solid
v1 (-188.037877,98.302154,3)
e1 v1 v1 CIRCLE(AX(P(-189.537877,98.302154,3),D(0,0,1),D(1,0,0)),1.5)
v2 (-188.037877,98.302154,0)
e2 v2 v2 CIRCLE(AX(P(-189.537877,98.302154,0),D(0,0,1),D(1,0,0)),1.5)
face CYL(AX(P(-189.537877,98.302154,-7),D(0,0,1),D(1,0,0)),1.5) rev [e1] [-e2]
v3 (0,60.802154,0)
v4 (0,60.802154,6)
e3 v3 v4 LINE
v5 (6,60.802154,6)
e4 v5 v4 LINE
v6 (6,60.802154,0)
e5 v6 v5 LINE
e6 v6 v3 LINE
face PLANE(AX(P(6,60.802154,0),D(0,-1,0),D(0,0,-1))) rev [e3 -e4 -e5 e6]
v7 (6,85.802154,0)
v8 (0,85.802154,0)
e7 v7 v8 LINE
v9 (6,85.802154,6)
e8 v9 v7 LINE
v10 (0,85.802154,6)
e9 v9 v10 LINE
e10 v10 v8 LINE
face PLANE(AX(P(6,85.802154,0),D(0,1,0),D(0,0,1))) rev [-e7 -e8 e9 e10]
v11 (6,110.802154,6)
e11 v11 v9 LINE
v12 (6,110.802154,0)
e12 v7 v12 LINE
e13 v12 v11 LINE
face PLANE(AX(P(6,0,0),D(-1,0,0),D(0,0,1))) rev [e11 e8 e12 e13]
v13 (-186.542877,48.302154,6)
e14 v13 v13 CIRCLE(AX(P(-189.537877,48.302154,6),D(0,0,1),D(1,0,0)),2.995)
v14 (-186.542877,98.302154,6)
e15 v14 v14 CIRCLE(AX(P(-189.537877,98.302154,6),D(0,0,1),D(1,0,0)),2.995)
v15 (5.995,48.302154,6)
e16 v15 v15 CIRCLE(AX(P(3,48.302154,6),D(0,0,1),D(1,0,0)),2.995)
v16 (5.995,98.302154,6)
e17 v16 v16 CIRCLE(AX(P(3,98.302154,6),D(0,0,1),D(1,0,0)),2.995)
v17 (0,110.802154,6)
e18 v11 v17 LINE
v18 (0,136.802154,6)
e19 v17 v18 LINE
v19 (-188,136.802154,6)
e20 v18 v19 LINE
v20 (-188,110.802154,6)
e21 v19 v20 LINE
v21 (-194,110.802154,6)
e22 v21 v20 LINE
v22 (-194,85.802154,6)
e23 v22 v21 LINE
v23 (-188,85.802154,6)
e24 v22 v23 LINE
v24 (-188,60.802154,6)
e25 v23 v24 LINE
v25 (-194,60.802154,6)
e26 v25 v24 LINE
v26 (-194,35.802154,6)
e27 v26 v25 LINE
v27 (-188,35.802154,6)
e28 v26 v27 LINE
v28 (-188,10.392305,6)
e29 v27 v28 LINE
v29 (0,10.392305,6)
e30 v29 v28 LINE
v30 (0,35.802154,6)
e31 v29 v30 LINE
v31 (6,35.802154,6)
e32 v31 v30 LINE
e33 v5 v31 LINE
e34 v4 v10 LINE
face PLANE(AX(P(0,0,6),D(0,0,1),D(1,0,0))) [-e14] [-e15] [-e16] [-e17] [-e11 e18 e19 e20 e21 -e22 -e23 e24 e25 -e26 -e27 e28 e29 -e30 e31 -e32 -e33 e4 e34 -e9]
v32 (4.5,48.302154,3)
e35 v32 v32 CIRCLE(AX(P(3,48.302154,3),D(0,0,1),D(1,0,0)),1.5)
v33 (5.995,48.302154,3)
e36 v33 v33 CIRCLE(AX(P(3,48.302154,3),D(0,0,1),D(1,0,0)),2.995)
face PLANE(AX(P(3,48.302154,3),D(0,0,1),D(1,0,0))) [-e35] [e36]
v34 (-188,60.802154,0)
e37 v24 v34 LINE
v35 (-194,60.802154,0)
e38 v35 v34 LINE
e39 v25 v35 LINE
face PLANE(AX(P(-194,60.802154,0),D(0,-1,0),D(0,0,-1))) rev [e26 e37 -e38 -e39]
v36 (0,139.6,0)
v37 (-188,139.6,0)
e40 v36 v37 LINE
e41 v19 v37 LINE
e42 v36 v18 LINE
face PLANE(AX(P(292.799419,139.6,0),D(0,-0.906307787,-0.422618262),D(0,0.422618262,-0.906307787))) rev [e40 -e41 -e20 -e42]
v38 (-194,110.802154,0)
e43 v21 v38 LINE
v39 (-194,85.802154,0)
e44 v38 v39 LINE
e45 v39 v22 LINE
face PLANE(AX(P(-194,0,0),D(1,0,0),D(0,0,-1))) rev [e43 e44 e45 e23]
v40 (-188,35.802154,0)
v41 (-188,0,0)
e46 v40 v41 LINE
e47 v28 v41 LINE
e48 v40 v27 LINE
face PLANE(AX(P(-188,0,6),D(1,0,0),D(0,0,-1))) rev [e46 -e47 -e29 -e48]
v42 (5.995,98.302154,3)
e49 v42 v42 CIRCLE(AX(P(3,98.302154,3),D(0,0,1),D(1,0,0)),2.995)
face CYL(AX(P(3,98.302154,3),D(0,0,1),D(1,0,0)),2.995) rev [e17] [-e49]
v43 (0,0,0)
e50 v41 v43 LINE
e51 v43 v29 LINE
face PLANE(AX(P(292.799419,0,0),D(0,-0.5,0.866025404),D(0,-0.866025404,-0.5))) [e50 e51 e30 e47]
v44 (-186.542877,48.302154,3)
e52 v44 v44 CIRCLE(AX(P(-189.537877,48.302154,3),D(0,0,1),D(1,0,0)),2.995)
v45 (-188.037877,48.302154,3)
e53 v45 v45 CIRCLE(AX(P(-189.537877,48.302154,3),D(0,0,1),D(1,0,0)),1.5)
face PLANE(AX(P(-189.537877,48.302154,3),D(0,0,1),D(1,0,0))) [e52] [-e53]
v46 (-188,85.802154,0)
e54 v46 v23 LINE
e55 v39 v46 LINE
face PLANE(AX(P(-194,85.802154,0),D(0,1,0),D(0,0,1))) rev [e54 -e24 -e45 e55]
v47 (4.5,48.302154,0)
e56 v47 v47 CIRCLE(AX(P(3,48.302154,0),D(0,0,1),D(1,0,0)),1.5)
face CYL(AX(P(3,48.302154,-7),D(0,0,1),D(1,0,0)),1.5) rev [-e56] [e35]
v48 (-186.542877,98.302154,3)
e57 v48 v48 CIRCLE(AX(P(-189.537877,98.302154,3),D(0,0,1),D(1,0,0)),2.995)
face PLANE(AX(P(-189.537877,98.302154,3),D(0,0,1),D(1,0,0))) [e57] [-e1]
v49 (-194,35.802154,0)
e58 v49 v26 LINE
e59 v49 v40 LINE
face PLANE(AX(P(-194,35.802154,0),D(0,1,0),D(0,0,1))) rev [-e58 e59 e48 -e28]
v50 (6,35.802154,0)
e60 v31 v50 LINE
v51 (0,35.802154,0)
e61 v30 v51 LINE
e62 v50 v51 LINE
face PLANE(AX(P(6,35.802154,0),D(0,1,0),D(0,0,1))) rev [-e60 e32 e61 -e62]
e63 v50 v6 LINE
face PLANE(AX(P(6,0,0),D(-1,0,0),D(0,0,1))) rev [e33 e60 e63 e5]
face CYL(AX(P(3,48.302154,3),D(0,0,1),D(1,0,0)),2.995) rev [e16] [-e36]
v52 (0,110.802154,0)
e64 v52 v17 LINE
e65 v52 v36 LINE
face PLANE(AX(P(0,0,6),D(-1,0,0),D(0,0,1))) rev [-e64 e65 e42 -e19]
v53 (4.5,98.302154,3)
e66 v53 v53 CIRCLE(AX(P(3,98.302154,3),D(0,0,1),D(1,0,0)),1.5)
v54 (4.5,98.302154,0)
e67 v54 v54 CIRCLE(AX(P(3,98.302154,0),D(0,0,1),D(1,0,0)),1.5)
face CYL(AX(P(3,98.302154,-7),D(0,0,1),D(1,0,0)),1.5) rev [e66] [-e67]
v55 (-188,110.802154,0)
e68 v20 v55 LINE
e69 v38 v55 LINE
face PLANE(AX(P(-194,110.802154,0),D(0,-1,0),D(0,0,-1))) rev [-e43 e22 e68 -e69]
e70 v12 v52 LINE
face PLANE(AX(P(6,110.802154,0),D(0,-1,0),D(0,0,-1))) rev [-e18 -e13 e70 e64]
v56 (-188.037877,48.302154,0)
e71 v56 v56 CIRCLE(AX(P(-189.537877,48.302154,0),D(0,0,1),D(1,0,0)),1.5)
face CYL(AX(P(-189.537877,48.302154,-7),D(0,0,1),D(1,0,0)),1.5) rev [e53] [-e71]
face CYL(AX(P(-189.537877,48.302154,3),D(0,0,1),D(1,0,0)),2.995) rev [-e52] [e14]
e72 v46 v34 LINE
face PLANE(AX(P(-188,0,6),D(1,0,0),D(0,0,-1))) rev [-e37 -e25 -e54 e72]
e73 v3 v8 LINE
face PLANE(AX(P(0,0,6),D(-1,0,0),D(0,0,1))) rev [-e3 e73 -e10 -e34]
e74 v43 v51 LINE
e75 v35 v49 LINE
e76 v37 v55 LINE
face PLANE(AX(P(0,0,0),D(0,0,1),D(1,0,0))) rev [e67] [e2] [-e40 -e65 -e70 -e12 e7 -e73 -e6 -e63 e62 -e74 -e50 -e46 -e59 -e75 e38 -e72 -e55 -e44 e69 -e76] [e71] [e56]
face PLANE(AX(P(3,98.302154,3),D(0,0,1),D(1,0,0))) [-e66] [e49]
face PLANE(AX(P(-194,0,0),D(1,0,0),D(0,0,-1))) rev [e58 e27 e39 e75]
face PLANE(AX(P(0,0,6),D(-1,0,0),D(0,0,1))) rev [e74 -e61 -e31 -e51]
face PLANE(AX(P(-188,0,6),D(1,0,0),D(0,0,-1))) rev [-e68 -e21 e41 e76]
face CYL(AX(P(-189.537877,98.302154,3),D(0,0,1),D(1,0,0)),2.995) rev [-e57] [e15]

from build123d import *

# Parameters (mm, degrees)
ESQUISSE1_W                  = 188
ESQUISSE1_H                  = 139.6
BOSS_EXTRU_1_DEPTH           = 6
ENL_V_START                  = -189
ENL_V_MAT_EXTRU_3_DEPTH      = 190
ENL_V_MAT_EXTRU_4_DEPTH      = 235.239535519
ENL_V_MAT_EXTRU_4_DEPTH_BACK = 235.239535519
ESQUISSE7_W                  = 6
ESQUISSE7_H                  = 25
BOSS_EXTRU_3_DEPTH           = 6
ESQUISSE9_W                  = 6
ESQUISSE9_H                  = 25
BOSS_EXTRU_4_DEPTH           = 6
ESQUISSE11_R                 = 2.995
ENL_V_MAT_EXTRU_7_DEPTH      = 3
ESQUISSE12_R                 = 1.5
ENL_V_MAT_EXTRU_8_DEPTH      = 13


with BuildPart() as part:
    # Esquisse1 → Boss.-Extru.1 (new body)
    with BuildSketch(Plane.XY):
        with Locations((-94, 69.8)):
            Rectangle(ESQUISSE1_W, ESQUISSE1_H)
    extrude(amount=BOSS_EXTRU_1_DEPTH)

    # Enlèv. mat.-Extru.3: read off the stored shape, not the designer's step
    # Enlèv. mat.-Extru.3 outline → Enlèv. mat.-Extru.3 (cut)
    with BuildSketch(Plane(origin=(0, 0, 0), x_dir=(0, 0, -1), z_dir=(1, 0, 0)).offset(ENL_V_START)):
        Polygon((-6, 139.6), (-6, 136.802154051), (0, 139.6), align=None)
    extrude(amount=ENL_V_MAT_EXTRU_3_DEPTH, mode=Mode.SUBTRACT)

    # Esquisse4 → Enlèv. mat.-Extru.4 (cut, two sides: drawn at the far end of the back side and taken through both)
    with BuildSketch(Plane(origin=(0, 0, 0), x_dir=(0, 0, -1), z_dir=(1, 0, 0)).offset(-ENL_V_MAT_EXTRU_4_DEPTH_BACK)):
        Polygon((144.728880336, -250.677774065), (0, 0), (-6, 10.392304845), (-150.728880336, 261.07007891), (-652.084428466, -28.387681762), (-356.626667793, -540.135534737), align=None)
    extrude(amount=ENL_V_MAT_EXTRU_4_DEPTH + ENL_V_MAT_EXTRU_4_DEPTH_BACK, mode=Mode.SUBTRACT)

    # Esquisse7 → Boss.-Extru.3 (add)
    with BuildSketch(Plane(origin=(0, 0, 0), x_dir=(0, 0, -1), z_dir=(1, 0, 0))):
        with Locations((-3, 98.302154051)):
            Rectangle(ESQUISSE7_W, ESQUISSE7_H)
        with Locations((-3, 48.302154051)):
            Rectangle(ESQUISSE7_W, ESQUISSE7_H)
    extrude(amount=BOSS_EXTRU_3_DEPTH)

    # Esquisse9 → Boss.-Extru.4 (add)
    with BuildSketch(Plane.ZY.offset(188)):
        with Locations((3, 48.302154051)):
            Rectangle(ESQUISSE9_W, ESQUISSE9_H)
        with Locations((3, 98.302154051)):
            Rectangle(ESQUISSE9_W, ESQUISSE9_H)
    extrude(amount=BOSS_EXTRU_4_DEPTH)

    # Esquisse11 → Enlèv. mat.-Extru.7 (cut)
    with BuildSketch(Plane.XY.offset(6)):
        with Locations((3, 48.302154051)):
            Circle(ESQUISSE11_R)
        with Locations((3, 98.302154051)):
            Circle(ESQUISSE11_R)
        with Locations((-189.537877077, 48.302154051)):
            Circle(ESQUISSE11_R)
        with Locations((-189.537877077, 98.302154051)):
            Circle(ESQUISSE11_R)
    extrude(amount=-ENL_V_MAT_EXTRU_7_DEPTH, mode=Mode.SUBTRACT)

    # Esquisse12 → Enlèv. mat.-Extru.8 (cut)
    with BuildSketch(Plane.XY.offset(6)):
        with Locations((3, 98.302154051)):
            Circle(ESQUISSE12_R)
        with Locations((3, 48.302154051)):
            Circle(ESQUISSE12_R)
        with Locations((-189.537877077, 48.302154051)):
            Circle(ESQUISSE12_R)
        with Locations((-189.537877077, 98.302154051)):
            Circle(ESQUISSE12_R)
    extrude(amount=-ENL_V_MAT_EXTRU_8_DEPTH, mode=Mode.SUBTRACT)


solid = part.part
